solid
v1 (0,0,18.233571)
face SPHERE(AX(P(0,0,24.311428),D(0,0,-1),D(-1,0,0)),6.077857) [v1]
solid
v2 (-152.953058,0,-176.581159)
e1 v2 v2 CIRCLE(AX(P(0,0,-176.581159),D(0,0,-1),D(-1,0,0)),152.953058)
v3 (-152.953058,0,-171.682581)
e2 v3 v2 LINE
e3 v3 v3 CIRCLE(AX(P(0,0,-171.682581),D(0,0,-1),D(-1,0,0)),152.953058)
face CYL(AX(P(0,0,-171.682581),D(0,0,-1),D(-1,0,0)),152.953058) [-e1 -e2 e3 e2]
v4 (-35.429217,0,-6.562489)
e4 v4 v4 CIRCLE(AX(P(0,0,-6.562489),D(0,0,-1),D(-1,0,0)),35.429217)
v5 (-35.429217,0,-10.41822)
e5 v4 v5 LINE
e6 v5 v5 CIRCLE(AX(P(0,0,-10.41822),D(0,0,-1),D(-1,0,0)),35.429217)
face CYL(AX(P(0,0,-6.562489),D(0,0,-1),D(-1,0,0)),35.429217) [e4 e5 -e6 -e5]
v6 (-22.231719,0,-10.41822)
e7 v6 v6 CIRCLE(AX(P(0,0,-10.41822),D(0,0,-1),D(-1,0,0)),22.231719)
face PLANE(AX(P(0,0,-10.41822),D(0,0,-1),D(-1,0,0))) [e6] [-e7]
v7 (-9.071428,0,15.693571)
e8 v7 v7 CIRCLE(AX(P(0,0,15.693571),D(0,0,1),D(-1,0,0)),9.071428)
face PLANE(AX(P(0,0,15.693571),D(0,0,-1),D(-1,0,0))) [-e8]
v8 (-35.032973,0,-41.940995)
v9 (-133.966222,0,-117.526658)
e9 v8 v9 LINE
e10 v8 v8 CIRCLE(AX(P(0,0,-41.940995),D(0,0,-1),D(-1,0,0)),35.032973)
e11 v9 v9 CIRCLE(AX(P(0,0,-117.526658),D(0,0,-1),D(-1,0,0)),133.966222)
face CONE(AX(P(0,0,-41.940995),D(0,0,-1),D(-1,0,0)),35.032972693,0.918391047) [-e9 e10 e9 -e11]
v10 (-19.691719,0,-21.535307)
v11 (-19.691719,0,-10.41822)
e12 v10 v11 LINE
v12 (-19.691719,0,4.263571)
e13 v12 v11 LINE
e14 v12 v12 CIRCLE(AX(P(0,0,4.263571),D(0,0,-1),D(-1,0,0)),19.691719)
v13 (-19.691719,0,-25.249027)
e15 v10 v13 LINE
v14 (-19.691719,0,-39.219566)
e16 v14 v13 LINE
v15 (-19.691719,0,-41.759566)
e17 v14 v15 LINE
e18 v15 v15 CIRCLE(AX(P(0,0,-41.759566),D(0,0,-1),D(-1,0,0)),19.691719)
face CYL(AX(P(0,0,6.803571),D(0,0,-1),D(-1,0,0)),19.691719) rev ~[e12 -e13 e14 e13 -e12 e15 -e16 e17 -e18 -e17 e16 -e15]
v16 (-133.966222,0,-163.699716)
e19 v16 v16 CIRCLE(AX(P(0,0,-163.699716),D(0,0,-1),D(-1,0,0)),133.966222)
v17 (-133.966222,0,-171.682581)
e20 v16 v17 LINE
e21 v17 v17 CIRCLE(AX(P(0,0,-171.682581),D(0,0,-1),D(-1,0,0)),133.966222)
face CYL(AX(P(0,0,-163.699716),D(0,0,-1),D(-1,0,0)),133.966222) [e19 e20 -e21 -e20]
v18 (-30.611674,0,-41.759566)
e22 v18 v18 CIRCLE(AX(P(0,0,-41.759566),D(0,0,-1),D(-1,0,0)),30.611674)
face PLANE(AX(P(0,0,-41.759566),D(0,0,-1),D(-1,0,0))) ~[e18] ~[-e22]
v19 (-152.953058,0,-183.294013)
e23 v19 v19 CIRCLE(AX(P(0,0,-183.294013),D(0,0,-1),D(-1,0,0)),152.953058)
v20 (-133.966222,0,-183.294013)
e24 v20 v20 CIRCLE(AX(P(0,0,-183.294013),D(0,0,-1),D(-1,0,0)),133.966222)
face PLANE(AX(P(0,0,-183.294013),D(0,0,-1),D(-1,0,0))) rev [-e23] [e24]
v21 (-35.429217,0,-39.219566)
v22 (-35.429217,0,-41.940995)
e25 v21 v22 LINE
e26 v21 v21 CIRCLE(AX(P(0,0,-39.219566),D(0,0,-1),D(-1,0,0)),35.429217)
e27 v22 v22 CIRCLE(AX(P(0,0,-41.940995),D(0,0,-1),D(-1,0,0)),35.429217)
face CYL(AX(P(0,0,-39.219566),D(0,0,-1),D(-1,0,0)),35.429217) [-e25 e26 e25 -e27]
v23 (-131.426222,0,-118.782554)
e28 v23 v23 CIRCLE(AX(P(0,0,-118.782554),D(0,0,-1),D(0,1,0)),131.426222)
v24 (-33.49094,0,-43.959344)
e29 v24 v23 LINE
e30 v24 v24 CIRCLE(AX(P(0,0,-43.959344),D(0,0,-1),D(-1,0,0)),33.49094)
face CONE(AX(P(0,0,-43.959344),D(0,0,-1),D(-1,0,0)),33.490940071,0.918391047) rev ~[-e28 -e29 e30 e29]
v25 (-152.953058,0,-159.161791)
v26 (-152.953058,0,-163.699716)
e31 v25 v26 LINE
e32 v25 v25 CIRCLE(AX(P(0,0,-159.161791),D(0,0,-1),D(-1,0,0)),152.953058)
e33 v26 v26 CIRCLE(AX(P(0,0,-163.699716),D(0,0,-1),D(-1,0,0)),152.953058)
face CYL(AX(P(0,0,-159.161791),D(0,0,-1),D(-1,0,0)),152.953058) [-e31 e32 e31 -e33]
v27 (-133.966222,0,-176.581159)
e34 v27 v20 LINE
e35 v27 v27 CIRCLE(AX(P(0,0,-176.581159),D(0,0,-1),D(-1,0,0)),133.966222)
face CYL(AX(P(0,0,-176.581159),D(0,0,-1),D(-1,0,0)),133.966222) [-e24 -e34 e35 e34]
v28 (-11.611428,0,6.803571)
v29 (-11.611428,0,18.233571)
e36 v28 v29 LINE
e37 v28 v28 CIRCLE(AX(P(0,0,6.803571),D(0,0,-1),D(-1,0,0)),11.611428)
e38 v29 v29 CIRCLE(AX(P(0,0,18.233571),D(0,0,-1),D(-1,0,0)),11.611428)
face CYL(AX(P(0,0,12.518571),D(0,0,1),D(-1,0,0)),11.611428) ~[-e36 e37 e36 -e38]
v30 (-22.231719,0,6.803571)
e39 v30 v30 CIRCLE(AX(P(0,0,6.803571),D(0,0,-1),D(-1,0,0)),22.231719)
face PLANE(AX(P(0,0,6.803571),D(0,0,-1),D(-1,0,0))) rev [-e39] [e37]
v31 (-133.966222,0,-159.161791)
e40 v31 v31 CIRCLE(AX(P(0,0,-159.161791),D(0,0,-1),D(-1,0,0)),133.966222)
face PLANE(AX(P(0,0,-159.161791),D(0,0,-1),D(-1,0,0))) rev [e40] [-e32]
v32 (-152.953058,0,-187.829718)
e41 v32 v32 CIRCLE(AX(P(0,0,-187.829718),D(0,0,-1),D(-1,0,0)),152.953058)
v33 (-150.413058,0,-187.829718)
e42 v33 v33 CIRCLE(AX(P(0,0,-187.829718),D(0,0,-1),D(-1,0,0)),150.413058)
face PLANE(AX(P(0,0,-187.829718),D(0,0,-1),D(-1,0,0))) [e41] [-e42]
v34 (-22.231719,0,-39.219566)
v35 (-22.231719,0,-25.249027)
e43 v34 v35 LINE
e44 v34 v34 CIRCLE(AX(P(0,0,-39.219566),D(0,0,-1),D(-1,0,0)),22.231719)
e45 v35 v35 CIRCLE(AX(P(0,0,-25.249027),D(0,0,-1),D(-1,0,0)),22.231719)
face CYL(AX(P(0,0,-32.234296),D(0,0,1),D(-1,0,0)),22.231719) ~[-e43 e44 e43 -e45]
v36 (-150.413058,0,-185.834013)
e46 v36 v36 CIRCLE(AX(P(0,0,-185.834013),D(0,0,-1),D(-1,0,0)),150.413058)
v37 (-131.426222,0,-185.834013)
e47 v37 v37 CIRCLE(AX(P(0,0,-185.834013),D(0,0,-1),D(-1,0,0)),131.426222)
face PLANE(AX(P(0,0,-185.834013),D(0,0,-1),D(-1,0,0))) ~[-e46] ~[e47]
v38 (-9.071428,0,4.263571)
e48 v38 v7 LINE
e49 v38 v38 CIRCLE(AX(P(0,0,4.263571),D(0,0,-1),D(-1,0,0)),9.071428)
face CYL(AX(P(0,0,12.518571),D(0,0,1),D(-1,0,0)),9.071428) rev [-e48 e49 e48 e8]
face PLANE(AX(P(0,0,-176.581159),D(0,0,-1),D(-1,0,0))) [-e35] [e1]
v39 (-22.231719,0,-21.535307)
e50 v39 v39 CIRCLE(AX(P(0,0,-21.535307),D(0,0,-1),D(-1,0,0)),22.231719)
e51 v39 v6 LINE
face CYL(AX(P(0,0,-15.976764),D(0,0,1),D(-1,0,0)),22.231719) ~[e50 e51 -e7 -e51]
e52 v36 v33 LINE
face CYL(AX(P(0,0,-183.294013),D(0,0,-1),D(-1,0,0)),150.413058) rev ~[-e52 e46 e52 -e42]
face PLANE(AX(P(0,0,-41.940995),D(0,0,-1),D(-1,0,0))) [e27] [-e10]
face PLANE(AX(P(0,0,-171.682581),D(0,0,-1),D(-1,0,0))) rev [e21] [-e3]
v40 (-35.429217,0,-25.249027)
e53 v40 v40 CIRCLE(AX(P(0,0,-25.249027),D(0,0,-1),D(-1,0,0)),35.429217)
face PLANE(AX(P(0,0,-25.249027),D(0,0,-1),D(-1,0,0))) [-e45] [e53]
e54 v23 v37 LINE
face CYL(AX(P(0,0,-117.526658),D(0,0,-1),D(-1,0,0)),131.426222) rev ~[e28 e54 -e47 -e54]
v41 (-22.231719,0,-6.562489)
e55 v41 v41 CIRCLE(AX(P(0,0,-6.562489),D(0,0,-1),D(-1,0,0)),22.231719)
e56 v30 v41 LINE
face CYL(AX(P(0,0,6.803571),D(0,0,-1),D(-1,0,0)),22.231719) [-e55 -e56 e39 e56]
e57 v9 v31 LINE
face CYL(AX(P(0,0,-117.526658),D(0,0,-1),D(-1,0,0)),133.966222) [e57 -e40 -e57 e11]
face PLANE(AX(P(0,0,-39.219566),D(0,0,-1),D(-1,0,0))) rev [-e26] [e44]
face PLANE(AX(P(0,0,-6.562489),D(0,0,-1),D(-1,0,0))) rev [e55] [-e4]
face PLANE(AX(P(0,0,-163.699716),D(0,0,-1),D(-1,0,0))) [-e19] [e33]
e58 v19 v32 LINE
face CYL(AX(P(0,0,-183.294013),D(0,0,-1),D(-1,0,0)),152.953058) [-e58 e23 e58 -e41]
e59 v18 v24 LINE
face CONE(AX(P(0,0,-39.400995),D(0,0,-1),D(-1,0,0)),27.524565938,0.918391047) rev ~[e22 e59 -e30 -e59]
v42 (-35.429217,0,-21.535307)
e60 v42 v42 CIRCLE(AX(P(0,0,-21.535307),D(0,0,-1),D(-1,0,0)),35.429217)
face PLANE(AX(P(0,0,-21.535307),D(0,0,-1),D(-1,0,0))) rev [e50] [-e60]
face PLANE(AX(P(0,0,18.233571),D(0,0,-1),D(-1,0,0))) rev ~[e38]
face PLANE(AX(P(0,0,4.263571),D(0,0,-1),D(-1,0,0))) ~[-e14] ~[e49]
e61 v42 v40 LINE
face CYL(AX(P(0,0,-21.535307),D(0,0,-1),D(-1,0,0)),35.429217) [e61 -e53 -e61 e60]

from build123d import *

# Parameters (mm, degrees)
F0_W   = 11.6114281118
F0_H   = 11.429999955
F0_W_2 = 22.2317185253
F0_H_2 = 11.1170867458
F0_H_3 = 13.9705389738
F2_T   = 2.54


# Not quite as in the source:
# - a shell that OpenCascade refuses in one call is made with other operations: the cavity is built on its own and cut out


with BuildPart() as f1:
    # F0 (on Front) → F1 (revolve)
    with BuildSketch(Plane.XZ):
        Polygon((0, -187.8297179937), (0, -41.9409945607), (-35.0329726934, -41.9409945607), (-133.9662224054, -117.5266578425), (-133.9662224054, -159.1617912054), (-152.9530584812, -159.1617912054), (-152.9530584812, -163.6997163296), (-133.9662224054, -163.6997163296), (-133.9662224054, -171.6825813055), (-152.9530584812, -171.6825813055), (-152.9530584812, -176.581159234), (-133.9662224054, -176.581159234), (-133.9662224054, -183.2940131426), (-152.9530584812, -183.2940131426), (-152.9530584812, -187.8297179937), align=None)
        with Locations((-5.8057140559, 12.5185712241)):
            Rectangle(F0_W, F0_H)
        Polygon((0, -6.5624886192), (0, 6.8035712466), (-11.6114281118, 6.8035712466), (-22.2317185253, 6.8035712466), (-22.2317185253, -6.5624886192), align=None)
        Polygon((0, -10.4182204232), (0, -6.5624886192), (-22.2317185253, -6.5624886192), (-35.4292169213, -6.5624886192), (-35.4292169213, -10.4182204232), (-22.2317185253, -10.4182204232), align=None)
        with Locations((-11.1158592626, -15.9767637961)):
            Rectangle(F0_W_2, F0_H_2)
        Polygon((0, -25.2490267158), (0, -21.535307169), (-22.2317185253, -21.535307169), (-35.4292169213, -21.535307169), (-35.4292169213, -25.2490267158), (-22.2317185253, -25.2490267158), align=None)
        with Locations((-11.1158592626, -32.2342962027)):
            Rectangle(F0_W_2, F0_H_3)
        Polygon((0, -41.9409945607), (0, -39.2195656896), (-22.2317185253, -39.2195656896), (-35.4292169213, -39.2195656896), (-35.4292169213, -41.9409945607), (-35.0329726934, -41.9409945607), align=None)
    revolve(axis=Axis((0, 0, -78.7202166393), (0, 0, -1)))

    # F2: shell of thickness 2.54, made by hand


with BuildPart() as f1b:
    # F0 (on Front) → F1, piece 2 (revolve)
    with BuildSketch(Plane.XZ):
        with BuildLine():
            Line((0, 18.2335712016), (0, 30.3892847151))
            ThreePointArc((0, 30.3892847151), (-6.0778567567, 24.3114279583), (0, 18.2335712016))
        make_face()
    revolve(axis=Axis((0, 0, -78.7202166393), (0, 0, -1)))


with BuildPart() as f2_core1:
    # F2_t2: copy of F1
    add(f1.part)

    # the walls: a layer under each face that stays
    f2_faces = [f2_core1.faces().sort_by_distance(p)[0] for p in [
        (0, 0, 18.2335712016),
        (11.6114281118, 0, 12.5185712241),
        (-14.8211456835, -14.8211456835, 6.8035712466),
        (22.2317185253, 0, 0.1205413137),
        (-23.6194779476, -23.6194779476, -6.5624886192),
        (35.4292169213, 0, -8.4903545212),
        (23.6194779476, -23.6194779476, -10.4182204232),
        (22.2317185253, 0, -15.9767637961),
        (-23.6194779476, -23.6194779476, -21.535307169),
        (35.4292169213, 0, -23.3921669424),
        (23.6194779476, -23.6194779476, -25.2490267158),
        (22.2317185253, 0, -32.2342962027),
        (-23.6194779476, -23.6194779476, -39.2195656896),
        (35.4292169213, 0, -40.5802801251),
        (-31.0005648062, -17.058511851, -41.9409945607),
        (84.4995975494, 0, -79.7338262016),
        (133.9662224054, 0, -138.344224524),
        (-101.9687056541, -101.9687056541, -159.1617912054),
        (152.9530584812, 0, -161.4307537675),
        (101.9687056541, -101.9687056541, -163.6997163296),
        (133.9662224054, 0, -167.6911488175),
        (-101.9687056541, -101.9687056541, -171.6825813055),
        (152.9530584812, 0, -174.1318702698),
        (101.9687056541, -101.9687056541, -176.581159234),
        (133.9662224054, 0, -179.9375861883),
        (-101.9687056541, -101.9687056541, -183.2940131426),
        (152.9530584812, 0, -185.5618655682),
    ]]
    thicken(f2_faces, amount=-F2_T, mode=Mode.SUBTRACT)

    # F2_s3 → F2_t4 (revolve, cut)
    with BuildSketch(Plane.XZ):
        Polygon((-11.6368281118, 6.8289712466), (-9.0714281118, 6.8035712466), (-9.0714281118, 4.2635712466), (-11.6114281118, 4.2635712466), align=None)
    revolve(axis=Axis((0, 0, 6.8035712466), (0, 0, -1)), mode=Mode.SUBTRACT)

    # F2_s5 → F2_t6 (revolve, cut)
    with BuildSketch(Plane.XZ):
        Polygon((-22.2571185253, -6.5370886192), (-19.6917185253, -6.5624886192), (-19.6917185253, -9.1024886192), (-22.2317185253, -9.1024886192), align=None)
    revolve(axis=Axis((0, 0, -6.5624886192), (0, 0, -1)), mode=Mode.SUBTRACT)

    # F2_s7 → F2_t8 (revolve, cut)
    with BuildSketch(Plane.XZ):
        Polygon((-22.2571185253, -10.4436204232), (-22.2317185253, -7.8782204232), (-19.6917185253, -7.8782204232), (-19.6917185253, -10.4182204232), align=None)
    revolve(axis=Axis((0, 0, -10.4182204232), (0, 0, -1)), mode=Mode.SUBTRACT)

    # F2_s9 → F2_t10 (revolve, cut)
    with BuildSketch(Plane.XZ):
        Polygon((-22.2571185253, -21.509907169), (-19.6917185253, -21.535307169), (-19.6917185253, -24.075307169), (-22.2317185253, -24.075307169), align=None)
    revolve(axis=Axis((0, 0, -21.535307169), (0, 0, -1)), mode=Mode.SUBTRACT)

    # F2_s11 → F2_t12 (revolve, cut)
    with BuildSketch(Plane.XZ):
        Polygon((-22.2571185253, -25.2744267158), (-22.2317185253, -22.7090267158), (-19.6917185253, -22.7090267158), (-19.6917185253, -25.2490267158), align=None)
    revolve(axis=Axis((0, 0, -25.2490267158), (0, 0, -1)), mode=Mode.SUBTRACT)

    # F2_s13 → F2_t14 (revolve, cut)
    with BuildSketch(Plane.XZ):
        Polygon((-22.2571185253, -39.1941656896), (-19.6917185253, -39.2195656896), (-19.6917185253, -41.7595656896), (-22.2317185253, -41.7595656896), align=None)
    revolve(axis=Axis((0, 0, -39.2195656896), (0, 0, -1)), mode=Mode.SUBTRACT)

    # F2_s15 → F2_t16 (revolve, cut)
    with BuildSketch(Plane.XZ):
        Polygon((-35.0483930197, -41.946211064), (-35.0329726934, -39.4009945607), (-27.5245659384, -39.4009945607), (-33.4909400706, -43.9593442307), align=None)
    revolve(axis=Axis((0, 0, -41.9409945607), (0, 0, -1)), mode=Mode.SUBTRACT)

    # F2_s17 → F2_t18 (revolve, cut)
    with BuildSketch(Plane.XZ):
        Polygon((-133.9916224054, -159.1363912054), (-131.4262224054, -159.1617912054), (-131.4262224054, -161.7017912054), (-133.9662224054, -161.7017912054), align=None)
    revolve(axis=Axis((0, 0, -159.1617912054), (0, 0, -1)), mode=Mode.SUBTRACT)

    # F2_s19 → F2_t20 (revolve, cut)
    with BuildSketch(Plane.XZ):
        Polygon((-133.9916224054, -163.7251163296), (-133.9662224054, -161.1597163296), (-131.4262224054, -161.1597163296), (-131.4262224054, -163.6997163296), align=None)
    revolve(axis=Axis((0, 0, -163.6997163296), (0, 0, -1)), mode=Mode.SUBTRACT)

    # F2_s21 → F2_t22 (revolve, cut)
    with BuildSketch(Plane.XZ):
        Polygon((-133.9916224054, -171.6571813055), (-131.4262224054, -171.6825813055), (-131.4262224054, -174.2225813055), (-133.9662224054, -174.2225813055), align=None)
    revolve(axis=Axis((0, 0, -171.6825813055), (0, 0, -1)), mode=Mode.SUBTRACT)

    # F2_s23 → F2_t24 (revolve, cut)
    with BuildSketch(Plane.XZ):
        Polygon((-133.9916224054, -176.606559234), (-133.9662224054, -174.041159234), (-131.4262224054, -174.041159234), (-131.4262224054, -176.581159234), align=None)
    revolve(axis=Axis((0, 0, -176.581159234), (0, 0, -1)), mode=Mode.SUBTRACT)

    # F2_s25 → F2_t26 (revolve, cut)
    with BuildSketch(Plane.XZ):
        Polygon((-133.9916224054, -183.2686131426), (-131.4262224054, -183.2940131426), (-131.4262224054, -185.8340131426), (-133.9662224054, -185.8340131426), align=None)
    revolve(axis=Axis((0, 0, -183.2940131426), (0, 0, -1)), mode=Mode.SUBTRACT)


with BuildPart() as f1_1:
    add(f1.part)

    # what is left inside the walls is the cavity
    f2_cavity = [f2_core1.part.solids().sort_by_distance(p)[0] for p in [
        (0, -50.137686, -187.804318),
    ]]
    add(f2_cavity, mode=Mode.SUBTRACT)


solid = Compound([f1b.part, f1_1.part])
